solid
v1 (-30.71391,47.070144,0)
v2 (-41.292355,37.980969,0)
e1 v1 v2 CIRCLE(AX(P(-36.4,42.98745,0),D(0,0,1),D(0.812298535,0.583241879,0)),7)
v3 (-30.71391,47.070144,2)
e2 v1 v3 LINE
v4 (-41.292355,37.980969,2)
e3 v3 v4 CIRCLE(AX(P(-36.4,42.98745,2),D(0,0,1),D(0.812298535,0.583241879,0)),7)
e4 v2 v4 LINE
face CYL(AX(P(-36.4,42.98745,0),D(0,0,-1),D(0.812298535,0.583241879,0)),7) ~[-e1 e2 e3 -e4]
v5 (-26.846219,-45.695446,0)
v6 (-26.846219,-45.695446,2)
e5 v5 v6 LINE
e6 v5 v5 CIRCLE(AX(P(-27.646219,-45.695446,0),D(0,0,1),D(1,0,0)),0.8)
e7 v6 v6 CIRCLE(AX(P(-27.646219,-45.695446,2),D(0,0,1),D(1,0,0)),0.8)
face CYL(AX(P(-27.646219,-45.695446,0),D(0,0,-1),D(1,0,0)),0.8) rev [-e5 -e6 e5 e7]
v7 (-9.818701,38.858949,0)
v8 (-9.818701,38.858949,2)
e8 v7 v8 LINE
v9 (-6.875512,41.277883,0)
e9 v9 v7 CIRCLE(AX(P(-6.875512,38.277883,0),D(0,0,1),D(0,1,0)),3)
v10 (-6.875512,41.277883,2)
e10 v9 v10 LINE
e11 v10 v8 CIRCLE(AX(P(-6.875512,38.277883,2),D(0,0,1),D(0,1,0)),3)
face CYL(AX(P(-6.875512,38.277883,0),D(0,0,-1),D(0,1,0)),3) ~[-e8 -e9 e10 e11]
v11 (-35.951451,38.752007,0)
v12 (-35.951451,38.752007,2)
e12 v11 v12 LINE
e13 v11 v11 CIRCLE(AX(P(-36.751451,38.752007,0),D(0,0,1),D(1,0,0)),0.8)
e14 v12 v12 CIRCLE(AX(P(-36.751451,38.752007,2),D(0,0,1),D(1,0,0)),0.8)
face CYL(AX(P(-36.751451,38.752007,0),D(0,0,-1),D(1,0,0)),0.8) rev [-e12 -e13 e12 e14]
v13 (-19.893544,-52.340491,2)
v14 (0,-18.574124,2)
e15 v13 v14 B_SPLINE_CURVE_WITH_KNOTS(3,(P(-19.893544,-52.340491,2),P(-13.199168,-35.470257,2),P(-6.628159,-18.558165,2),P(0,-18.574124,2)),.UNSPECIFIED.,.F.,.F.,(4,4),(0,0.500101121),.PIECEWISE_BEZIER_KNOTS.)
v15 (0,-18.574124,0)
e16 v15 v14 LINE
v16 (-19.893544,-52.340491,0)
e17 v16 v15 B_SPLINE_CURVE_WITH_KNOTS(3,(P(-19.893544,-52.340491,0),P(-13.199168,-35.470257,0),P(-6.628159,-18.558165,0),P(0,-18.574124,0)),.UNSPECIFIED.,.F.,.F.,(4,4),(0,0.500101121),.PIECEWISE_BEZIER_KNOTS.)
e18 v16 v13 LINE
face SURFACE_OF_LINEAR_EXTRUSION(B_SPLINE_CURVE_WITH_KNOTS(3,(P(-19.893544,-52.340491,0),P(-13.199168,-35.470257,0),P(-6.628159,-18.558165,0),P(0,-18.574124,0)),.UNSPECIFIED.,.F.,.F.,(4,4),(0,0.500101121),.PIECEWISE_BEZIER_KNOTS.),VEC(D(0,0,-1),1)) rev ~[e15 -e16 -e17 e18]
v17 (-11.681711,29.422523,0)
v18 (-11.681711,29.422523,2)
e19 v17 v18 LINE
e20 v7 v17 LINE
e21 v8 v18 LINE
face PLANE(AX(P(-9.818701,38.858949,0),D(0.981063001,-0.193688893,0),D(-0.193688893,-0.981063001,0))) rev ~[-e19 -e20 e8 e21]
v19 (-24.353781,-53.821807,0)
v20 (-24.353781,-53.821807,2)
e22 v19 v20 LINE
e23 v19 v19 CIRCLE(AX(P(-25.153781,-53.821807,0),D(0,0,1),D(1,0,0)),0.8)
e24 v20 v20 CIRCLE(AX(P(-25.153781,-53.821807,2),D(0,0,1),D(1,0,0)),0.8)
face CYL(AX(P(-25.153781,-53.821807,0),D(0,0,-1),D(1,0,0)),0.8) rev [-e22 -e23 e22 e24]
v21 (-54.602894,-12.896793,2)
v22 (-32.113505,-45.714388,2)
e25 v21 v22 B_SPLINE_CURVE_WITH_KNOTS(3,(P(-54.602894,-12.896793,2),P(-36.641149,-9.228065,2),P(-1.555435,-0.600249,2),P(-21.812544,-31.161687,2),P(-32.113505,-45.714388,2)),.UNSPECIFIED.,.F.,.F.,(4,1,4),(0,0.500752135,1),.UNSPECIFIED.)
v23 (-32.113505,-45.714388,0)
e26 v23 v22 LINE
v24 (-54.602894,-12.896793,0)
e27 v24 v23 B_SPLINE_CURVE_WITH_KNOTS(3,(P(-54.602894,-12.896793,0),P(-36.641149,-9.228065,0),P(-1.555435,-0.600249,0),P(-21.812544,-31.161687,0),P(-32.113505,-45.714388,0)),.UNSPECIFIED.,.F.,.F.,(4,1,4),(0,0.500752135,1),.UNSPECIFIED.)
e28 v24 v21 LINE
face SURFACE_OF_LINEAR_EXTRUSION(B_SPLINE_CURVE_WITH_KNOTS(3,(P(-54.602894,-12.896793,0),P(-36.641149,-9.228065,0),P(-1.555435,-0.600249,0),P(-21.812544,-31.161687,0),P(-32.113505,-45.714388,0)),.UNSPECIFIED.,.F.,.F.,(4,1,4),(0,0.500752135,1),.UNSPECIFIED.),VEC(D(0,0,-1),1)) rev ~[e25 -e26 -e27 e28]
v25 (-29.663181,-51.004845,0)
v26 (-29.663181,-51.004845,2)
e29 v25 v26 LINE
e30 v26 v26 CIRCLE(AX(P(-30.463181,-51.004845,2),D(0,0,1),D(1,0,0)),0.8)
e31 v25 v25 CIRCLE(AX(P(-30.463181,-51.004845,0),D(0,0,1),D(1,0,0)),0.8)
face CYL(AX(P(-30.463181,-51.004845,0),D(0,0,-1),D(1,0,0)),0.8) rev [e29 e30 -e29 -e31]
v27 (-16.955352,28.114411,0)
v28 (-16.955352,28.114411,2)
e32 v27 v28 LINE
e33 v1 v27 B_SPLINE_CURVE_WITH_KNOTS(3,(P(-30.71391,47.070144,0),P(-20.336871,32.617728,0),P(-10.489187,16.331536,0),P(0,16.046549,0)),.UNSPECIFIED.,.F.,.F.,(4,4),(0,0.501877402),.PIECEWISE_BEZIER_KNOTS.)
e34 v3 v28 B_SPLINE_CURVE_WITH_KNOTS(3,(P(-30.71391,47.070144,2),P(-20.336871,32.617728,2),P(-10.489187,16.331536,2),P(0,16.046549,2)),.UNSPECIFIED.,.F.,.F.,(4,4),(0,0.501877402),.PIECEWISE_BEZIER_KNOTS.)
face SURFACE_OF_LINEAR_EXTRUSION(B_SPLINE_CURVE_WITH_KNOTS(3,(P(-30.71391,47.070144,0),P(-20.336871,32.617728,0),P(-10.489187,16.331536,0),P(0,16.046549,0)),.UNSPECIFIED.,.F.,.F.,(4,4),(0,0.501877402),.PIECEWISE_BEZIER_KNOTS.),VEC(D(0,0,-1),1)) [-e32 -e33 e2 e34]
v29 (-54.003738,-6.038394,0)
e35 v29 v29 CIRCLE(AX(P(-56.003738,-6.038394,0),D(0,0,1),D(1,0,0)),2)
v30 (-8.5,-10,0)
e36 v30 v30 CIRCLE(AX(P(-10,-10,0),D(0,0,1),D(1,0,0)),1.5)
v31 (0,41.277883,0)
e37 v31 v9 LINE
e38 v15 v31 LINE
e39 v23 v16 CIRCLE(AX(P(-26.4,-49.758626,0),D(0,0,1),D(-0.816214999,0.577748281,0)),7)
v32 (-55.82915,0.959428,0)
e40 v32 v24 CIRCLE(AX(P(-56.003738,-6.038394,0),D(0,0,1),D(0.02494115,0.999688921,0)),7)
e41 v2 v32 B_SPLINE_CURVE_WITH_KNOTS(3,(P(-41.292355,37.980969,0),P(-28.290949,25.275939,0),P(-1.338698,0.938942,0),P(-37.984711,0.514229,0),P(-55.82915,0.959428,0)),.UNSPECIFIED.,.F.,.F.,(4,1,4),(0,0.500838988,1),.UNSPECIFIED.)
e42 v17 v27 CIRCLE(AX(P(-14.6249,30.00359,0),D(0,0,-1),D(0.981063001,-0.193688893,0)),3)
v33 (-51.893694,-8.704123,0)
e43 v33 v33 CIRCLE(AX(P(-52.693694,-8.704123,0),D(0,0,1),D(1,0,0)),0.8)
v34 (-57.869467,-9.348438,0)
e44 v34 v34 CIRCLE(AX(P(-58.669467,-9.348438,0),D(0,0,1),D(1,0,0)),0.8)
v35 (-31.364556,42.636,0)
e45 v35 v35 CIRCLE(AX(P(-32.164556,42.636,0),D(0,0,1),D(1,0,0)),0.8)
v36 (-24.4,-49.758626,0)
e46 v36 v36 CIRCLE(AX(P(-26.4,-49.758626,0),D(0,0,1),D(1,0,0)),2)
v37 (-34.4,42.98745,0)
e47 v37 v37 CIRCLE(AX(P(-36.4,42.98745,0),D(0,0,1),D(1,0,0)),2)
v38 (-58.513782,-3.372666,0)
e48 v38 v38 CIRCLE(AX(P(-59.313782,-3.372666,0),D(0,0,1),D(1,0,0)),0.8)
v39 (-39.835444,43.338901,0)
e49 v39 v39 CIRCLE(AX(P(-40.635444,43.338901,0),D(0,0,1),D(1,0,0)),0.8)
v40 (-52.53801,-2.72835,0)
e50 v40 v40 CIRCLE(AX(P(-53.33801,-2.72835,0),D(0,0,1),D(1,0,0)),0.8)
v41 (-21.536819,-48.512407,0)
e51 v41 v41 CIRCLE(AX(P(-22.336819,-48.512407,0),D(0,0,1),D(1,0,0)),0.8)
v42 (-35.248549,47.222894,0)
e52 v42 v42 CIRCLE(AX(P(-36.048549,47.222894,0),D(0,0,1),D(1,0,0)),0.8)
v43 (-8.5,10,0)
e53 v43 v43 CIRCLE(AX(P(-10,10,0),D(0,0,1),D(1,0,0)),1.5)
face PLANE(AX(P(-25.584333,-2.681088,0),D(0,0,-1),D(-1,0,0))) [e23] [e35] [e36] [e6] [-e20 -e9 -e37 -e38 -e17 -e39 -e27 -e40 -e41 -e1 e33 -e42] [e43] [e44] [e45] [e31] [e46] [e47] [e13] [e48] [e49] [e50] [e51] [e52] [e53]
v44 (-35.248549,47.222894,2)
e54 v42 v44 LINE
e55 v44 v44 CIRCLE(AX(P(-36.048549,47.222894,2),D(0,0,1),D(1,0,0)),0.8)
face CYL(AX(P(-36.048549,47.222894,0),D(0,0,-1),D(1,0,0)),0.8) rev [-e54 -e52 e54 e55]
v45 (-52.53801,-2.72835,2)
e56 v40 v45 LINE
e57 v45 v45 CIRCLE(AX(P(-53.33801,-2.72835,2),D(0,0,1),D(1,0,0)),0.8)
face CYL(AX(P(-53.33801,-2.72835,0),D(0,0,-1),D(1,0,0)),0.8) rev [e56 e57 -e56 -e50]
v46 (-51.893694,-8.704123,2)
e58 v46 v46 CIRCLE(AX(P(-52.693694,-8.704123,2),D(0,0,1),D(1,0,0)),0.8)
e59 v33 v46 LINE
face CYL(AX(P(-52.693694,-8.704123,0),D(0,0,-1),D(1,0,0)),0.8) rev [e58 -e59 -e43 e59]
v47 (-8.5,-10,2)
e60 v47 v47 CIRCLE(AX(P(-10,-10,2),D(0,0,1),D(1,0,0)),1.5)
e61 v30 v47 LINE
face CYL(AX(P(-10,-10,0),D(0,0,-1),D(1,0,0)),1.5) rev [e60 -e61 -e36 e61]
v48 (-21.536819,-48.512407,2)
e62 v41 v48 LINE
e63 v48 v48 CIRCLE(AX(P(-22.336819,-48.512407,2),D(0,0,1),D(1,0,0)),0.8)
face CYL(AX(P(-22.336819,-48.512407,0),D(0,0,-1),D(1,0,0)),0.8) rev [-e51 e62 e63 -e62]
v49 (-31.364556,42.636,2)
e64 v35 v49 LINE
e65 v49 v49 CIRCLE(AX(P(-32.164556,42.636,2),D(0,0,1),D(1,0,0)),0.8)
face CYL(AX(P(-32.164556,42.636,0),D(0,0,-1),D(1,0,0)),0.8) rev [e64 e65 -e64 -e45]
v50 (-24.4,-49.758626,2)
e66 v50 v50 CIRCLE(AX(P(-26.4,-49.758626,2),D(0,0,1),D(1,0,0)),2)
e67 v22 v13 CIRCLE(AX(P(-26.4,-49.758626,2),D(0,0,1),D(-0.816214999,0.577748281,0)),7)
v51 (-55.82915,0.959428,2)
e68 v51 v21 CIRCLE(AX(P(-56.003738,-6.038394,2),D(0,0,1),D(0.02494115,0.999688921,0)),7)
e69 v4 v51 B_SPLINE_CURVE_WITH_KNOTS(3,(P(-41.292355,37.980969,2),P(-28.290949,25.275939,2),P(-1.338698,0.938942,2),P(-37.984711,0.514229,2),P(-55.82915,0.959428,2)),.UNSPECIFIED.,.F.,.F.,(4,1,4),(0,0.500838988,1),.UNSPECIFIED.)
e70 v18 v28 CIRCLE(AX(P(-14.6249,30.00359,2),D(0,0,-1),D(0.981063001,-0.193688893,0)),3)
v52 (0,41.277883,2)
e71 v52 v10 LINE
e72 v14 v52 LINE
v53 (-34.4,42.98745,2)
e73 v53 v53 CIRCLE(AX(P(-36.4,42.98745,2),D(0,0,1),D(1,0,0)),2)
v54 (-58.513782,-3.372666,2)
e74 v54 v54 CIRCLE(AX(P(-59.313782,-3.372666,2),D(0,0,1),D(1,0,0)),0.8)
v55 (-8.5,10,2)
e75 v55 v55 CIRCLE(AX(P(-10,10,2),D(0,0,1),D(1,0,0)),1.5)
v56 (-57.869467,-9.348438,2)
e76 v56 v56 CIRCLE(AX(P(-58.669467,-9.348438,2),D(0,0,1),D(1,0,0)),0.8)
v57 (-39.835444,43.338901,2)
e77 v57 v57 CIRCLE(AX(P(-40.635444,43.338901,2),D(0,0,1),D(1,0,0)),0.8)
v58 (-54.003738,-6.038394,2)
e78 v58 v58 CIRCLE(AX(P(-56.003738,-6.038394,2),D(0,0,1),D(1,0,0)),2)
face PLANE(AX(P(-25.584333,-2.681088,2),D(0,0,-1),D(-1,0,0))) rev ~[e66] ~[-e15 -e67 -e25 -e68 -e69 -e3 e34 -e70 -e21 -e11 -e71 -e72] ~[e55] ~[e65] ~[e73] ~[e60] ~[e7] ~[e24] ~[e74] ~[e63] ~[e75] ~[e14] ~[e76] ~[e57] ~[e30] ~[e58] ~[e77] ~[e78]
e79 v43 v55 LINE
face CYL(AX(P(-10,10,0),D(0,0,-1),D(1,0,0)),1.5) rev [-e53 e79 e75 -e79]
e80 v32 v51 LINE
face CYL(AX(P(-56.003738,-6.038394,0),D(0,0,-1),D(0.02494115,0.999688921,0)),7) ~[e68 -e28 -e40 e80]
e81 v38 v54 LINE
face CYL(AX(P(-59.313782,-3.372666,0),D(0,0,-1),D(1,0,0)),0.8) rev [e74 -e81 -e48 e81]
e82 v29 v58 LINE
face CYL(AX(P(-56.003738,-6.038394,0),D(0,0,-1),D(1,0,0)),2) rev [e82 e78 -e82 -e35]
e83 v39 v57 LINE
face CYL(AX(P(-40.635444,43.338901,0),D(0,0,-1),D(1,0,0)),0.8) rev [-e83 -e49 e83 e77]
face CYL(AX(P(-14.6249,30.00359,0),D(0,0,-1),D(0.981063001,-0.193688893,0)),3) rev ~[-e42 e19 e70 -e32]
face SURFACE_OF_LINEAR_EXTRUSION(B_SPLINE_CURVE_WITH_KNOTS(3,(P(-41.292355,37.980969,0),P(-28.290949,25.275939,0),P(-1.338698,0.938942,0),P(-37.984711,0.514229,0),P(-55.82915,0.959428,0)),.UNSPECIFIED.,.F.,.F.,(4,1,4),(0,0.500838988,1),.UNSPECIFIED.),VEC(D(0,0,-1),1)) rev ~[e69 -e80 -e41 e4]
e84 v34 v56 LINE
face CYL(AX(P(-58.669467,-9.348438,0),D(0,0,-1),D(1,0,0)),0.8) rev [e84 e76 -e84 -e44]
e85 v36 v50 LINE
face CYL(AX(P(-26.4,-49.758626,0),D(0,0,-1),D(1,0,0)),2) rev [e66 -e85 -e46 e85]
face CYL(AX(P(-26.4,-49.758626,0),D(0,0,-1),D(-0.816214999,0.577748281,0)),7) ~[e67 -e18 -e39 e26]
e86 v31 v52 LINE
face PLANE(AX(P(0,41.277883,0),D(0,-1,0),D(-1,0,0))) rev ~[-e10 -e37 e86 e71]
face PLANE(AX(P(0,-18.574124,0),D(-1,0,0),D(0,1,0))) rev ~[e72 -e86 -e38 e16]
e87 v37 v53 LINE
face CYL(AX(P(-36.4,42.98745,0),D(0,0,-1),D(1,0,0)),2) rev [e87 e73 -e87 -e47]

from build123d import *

# Parameters (mm, degrees)
F0_R     = 0.8
F0_R_2   = 2
F0_R_3   = 1.5
F1_DEPTH = 2


with BuildPart() as f1:
    # F0 (on Top) → F1 (new body)
    with BuildSketch(Plane.XY):
        with BuildLine():
            add(Edge.make_bspline(
                [(-30.7139102544, 47.0701435694), (-26.0563740938, 40.5834526545), (-21.5054762535, 33.727348901), (-16.9553515314, 28.1144111899)],
                knots=[0, 0, 0, 0, 0.2252580977, 0.2252580977, 0.2252580977, 0.2252580977], degree=3))
            ThreePointArc((-30.7139102544, 47.0701435694), (-40.9618832344, 48.2968026675), (-41.2923553235, 37.980968676))
            add(Edge.make_bspline(
                [(-41.2923553235, 37.980968676), (-28.2909487562, 25.2759386837), (-1.3386977002, 0.9389418911), (-37.9847105167, 0.5142288136), (-55.8291501073, 0.959428143)],
                knots=[0, 0, 0, 0, 0.5008389877, 1, 1, 1, 1], degree=3))
            ThreePointArc((-55.8291501073, 0.959428143), (-62.9764861299, -6.6554726404), (-54.6028941093, -12.8967932407))
            add(Edge.make_bspline(
                [(-54.6028941093, -12.8967932407), (-36.6411490662, -9.2280647487), (-1.5554346637, -0.6002486072), (-21.8125444782, -31.161686503), (-32.1135049914, -45.7143883537)],
                knots=[0, 0, 0, 0, 0.5007521355, 1, 1, 1, 1], degree=3))
            ThreePointArc((-32.1135049914, -45.7143883537), (-29.7366902879, -55.9122023453), (-19.8935436127, -52.3404910086))
            add(Edge.make_bspline(
                [(-19.8935436127, -52.3404910086), (-13.1991680642, -35.4702565974), (-6.6281586733, -18.5581652323), (0, -18.5741237139)],
                knots=[0, 0, 0, 0, 0.5001011209, 0.5001011209, 0.5001011209, 0.5001011209], degree=3))
            Line((0, -18.5741237139), (0, 16.0465487335))
            add(Edge.make_bspline(
                [(-16.9553515314, 28.1144111899), (-11.3677507043, 21.221664878), (-5.7813157469, 16.2036250536), (0, 16.0465487335)],
                knots=[0.2252580977, 0.2252580977, 0.2252580977, 0.2252580977, 0.5018774016, 0.5018774016, 0.5018774016, 0.5018774016], degree=3))
        make_face()
        with Locations((-30.4631808179, -51.0048452558)):
            Circle(F0_R, mode=Mode.SUBTRACT)
        with Locations((-25.1537810623, -53.821807136)):
            Circle(F0_R, mode=Mode.SUBTRACT)
        with Locations((-26.4, -49.7586263181)):
            Circle(F0_R_2, mode=Mode.SUBTRACT)
        with Locations((-27.6462189377, -45.6954455001)):
            Circle(F0_R, mode=Mode.SUBTRACT)
        with Locations((-22.3368191821, -48.5124073803)):
            Circle(F0_R, mode=Mode.SUBTRACT)
        with Locations((-58.6694667332, -9.3484382842)):
            Circle(F0_R, mode=Mode.SUBTRACT)
        with Locations((-52.6936941752, -8.7041228837)):
            Circle(F0_R, mode=Mode.SUBTRACT)
        with Locations((-56.0037381545, -6.038394305)):
            Circle(F0_R_2, mode=Mode.SUBTRACT)
        with Locations((-10, -10)):
            Circle(F0_R_3, mode=Mode.SUBTRACT)
        with Locations((-59.3137821338, -3.3726657263)):
            Circle(F0_R, mode=Mode.SUBTRACT)
        with Locations((-53.3380095758, -2.7283503257)):
            Circle(F0_R, mode=Mode.SUBTRACT)
        with Locations((-10, 10)):
            Circle(F0_R_3, mode=Mode.SUBTRACT)
        with Locations((-36.7514506951, 38.752006823)):
            Circle(F0_R, mode=Mode.SUBTRACT)
        with Locations((-40.6354435906, 43.3389011087)):
            Circle(F0_R, mode=Mode.SUBTRACT)
        with Locations((-36.4, 42.9874504136)):
            Circle(F0_R_2, mode=Mode.SUBTRACT)
        with Locations((-32.1645564094, 42.6359997185)):
            Circle(F0_R, mode=Mode.SUBTRACT)
        with Locations((-36.0485493049, 47.2228940042)):
            Circle(F0_R, mode=Mode.SUBTRACT)
        with BuildLine():
            ThreePointArc((-11.6817113012, 29.4225234538), (-13.9026459734, 27.0918297248), (-16.9553515314, 28.1144111899))
            add(Edge.make_bspline(
                [(-16.9553515314, 28.1144111899), (-11.3677507043, 21.221664878), (-5.7813157469, 16.2036250536), (0, 16.0465487335)],
                knots=[0.2252580977, 0.2252580977, 0.2252580977, 0.2252580977, 0.5018774016, 0.5018774016, 0.5018774016, 0.5018774016], degree=3))
            Line((0, 16.0465487335), (0, 41.2778827355))
            Line((0, 41.2778827355), (-6.8755115637, 41.2778827355))
            ThreePointArc((-6.8755115637, 41.2778827355), (-8.7803475094, 40.5955539849), (-9.8187005677, 38.8589494156))
            Line((-9.8187005677, 38.8589494156), (-11.6817113012, 29.4225234538))
        make_face()
    extrude(amount=F1_DEPTH)


solid = f1.part
